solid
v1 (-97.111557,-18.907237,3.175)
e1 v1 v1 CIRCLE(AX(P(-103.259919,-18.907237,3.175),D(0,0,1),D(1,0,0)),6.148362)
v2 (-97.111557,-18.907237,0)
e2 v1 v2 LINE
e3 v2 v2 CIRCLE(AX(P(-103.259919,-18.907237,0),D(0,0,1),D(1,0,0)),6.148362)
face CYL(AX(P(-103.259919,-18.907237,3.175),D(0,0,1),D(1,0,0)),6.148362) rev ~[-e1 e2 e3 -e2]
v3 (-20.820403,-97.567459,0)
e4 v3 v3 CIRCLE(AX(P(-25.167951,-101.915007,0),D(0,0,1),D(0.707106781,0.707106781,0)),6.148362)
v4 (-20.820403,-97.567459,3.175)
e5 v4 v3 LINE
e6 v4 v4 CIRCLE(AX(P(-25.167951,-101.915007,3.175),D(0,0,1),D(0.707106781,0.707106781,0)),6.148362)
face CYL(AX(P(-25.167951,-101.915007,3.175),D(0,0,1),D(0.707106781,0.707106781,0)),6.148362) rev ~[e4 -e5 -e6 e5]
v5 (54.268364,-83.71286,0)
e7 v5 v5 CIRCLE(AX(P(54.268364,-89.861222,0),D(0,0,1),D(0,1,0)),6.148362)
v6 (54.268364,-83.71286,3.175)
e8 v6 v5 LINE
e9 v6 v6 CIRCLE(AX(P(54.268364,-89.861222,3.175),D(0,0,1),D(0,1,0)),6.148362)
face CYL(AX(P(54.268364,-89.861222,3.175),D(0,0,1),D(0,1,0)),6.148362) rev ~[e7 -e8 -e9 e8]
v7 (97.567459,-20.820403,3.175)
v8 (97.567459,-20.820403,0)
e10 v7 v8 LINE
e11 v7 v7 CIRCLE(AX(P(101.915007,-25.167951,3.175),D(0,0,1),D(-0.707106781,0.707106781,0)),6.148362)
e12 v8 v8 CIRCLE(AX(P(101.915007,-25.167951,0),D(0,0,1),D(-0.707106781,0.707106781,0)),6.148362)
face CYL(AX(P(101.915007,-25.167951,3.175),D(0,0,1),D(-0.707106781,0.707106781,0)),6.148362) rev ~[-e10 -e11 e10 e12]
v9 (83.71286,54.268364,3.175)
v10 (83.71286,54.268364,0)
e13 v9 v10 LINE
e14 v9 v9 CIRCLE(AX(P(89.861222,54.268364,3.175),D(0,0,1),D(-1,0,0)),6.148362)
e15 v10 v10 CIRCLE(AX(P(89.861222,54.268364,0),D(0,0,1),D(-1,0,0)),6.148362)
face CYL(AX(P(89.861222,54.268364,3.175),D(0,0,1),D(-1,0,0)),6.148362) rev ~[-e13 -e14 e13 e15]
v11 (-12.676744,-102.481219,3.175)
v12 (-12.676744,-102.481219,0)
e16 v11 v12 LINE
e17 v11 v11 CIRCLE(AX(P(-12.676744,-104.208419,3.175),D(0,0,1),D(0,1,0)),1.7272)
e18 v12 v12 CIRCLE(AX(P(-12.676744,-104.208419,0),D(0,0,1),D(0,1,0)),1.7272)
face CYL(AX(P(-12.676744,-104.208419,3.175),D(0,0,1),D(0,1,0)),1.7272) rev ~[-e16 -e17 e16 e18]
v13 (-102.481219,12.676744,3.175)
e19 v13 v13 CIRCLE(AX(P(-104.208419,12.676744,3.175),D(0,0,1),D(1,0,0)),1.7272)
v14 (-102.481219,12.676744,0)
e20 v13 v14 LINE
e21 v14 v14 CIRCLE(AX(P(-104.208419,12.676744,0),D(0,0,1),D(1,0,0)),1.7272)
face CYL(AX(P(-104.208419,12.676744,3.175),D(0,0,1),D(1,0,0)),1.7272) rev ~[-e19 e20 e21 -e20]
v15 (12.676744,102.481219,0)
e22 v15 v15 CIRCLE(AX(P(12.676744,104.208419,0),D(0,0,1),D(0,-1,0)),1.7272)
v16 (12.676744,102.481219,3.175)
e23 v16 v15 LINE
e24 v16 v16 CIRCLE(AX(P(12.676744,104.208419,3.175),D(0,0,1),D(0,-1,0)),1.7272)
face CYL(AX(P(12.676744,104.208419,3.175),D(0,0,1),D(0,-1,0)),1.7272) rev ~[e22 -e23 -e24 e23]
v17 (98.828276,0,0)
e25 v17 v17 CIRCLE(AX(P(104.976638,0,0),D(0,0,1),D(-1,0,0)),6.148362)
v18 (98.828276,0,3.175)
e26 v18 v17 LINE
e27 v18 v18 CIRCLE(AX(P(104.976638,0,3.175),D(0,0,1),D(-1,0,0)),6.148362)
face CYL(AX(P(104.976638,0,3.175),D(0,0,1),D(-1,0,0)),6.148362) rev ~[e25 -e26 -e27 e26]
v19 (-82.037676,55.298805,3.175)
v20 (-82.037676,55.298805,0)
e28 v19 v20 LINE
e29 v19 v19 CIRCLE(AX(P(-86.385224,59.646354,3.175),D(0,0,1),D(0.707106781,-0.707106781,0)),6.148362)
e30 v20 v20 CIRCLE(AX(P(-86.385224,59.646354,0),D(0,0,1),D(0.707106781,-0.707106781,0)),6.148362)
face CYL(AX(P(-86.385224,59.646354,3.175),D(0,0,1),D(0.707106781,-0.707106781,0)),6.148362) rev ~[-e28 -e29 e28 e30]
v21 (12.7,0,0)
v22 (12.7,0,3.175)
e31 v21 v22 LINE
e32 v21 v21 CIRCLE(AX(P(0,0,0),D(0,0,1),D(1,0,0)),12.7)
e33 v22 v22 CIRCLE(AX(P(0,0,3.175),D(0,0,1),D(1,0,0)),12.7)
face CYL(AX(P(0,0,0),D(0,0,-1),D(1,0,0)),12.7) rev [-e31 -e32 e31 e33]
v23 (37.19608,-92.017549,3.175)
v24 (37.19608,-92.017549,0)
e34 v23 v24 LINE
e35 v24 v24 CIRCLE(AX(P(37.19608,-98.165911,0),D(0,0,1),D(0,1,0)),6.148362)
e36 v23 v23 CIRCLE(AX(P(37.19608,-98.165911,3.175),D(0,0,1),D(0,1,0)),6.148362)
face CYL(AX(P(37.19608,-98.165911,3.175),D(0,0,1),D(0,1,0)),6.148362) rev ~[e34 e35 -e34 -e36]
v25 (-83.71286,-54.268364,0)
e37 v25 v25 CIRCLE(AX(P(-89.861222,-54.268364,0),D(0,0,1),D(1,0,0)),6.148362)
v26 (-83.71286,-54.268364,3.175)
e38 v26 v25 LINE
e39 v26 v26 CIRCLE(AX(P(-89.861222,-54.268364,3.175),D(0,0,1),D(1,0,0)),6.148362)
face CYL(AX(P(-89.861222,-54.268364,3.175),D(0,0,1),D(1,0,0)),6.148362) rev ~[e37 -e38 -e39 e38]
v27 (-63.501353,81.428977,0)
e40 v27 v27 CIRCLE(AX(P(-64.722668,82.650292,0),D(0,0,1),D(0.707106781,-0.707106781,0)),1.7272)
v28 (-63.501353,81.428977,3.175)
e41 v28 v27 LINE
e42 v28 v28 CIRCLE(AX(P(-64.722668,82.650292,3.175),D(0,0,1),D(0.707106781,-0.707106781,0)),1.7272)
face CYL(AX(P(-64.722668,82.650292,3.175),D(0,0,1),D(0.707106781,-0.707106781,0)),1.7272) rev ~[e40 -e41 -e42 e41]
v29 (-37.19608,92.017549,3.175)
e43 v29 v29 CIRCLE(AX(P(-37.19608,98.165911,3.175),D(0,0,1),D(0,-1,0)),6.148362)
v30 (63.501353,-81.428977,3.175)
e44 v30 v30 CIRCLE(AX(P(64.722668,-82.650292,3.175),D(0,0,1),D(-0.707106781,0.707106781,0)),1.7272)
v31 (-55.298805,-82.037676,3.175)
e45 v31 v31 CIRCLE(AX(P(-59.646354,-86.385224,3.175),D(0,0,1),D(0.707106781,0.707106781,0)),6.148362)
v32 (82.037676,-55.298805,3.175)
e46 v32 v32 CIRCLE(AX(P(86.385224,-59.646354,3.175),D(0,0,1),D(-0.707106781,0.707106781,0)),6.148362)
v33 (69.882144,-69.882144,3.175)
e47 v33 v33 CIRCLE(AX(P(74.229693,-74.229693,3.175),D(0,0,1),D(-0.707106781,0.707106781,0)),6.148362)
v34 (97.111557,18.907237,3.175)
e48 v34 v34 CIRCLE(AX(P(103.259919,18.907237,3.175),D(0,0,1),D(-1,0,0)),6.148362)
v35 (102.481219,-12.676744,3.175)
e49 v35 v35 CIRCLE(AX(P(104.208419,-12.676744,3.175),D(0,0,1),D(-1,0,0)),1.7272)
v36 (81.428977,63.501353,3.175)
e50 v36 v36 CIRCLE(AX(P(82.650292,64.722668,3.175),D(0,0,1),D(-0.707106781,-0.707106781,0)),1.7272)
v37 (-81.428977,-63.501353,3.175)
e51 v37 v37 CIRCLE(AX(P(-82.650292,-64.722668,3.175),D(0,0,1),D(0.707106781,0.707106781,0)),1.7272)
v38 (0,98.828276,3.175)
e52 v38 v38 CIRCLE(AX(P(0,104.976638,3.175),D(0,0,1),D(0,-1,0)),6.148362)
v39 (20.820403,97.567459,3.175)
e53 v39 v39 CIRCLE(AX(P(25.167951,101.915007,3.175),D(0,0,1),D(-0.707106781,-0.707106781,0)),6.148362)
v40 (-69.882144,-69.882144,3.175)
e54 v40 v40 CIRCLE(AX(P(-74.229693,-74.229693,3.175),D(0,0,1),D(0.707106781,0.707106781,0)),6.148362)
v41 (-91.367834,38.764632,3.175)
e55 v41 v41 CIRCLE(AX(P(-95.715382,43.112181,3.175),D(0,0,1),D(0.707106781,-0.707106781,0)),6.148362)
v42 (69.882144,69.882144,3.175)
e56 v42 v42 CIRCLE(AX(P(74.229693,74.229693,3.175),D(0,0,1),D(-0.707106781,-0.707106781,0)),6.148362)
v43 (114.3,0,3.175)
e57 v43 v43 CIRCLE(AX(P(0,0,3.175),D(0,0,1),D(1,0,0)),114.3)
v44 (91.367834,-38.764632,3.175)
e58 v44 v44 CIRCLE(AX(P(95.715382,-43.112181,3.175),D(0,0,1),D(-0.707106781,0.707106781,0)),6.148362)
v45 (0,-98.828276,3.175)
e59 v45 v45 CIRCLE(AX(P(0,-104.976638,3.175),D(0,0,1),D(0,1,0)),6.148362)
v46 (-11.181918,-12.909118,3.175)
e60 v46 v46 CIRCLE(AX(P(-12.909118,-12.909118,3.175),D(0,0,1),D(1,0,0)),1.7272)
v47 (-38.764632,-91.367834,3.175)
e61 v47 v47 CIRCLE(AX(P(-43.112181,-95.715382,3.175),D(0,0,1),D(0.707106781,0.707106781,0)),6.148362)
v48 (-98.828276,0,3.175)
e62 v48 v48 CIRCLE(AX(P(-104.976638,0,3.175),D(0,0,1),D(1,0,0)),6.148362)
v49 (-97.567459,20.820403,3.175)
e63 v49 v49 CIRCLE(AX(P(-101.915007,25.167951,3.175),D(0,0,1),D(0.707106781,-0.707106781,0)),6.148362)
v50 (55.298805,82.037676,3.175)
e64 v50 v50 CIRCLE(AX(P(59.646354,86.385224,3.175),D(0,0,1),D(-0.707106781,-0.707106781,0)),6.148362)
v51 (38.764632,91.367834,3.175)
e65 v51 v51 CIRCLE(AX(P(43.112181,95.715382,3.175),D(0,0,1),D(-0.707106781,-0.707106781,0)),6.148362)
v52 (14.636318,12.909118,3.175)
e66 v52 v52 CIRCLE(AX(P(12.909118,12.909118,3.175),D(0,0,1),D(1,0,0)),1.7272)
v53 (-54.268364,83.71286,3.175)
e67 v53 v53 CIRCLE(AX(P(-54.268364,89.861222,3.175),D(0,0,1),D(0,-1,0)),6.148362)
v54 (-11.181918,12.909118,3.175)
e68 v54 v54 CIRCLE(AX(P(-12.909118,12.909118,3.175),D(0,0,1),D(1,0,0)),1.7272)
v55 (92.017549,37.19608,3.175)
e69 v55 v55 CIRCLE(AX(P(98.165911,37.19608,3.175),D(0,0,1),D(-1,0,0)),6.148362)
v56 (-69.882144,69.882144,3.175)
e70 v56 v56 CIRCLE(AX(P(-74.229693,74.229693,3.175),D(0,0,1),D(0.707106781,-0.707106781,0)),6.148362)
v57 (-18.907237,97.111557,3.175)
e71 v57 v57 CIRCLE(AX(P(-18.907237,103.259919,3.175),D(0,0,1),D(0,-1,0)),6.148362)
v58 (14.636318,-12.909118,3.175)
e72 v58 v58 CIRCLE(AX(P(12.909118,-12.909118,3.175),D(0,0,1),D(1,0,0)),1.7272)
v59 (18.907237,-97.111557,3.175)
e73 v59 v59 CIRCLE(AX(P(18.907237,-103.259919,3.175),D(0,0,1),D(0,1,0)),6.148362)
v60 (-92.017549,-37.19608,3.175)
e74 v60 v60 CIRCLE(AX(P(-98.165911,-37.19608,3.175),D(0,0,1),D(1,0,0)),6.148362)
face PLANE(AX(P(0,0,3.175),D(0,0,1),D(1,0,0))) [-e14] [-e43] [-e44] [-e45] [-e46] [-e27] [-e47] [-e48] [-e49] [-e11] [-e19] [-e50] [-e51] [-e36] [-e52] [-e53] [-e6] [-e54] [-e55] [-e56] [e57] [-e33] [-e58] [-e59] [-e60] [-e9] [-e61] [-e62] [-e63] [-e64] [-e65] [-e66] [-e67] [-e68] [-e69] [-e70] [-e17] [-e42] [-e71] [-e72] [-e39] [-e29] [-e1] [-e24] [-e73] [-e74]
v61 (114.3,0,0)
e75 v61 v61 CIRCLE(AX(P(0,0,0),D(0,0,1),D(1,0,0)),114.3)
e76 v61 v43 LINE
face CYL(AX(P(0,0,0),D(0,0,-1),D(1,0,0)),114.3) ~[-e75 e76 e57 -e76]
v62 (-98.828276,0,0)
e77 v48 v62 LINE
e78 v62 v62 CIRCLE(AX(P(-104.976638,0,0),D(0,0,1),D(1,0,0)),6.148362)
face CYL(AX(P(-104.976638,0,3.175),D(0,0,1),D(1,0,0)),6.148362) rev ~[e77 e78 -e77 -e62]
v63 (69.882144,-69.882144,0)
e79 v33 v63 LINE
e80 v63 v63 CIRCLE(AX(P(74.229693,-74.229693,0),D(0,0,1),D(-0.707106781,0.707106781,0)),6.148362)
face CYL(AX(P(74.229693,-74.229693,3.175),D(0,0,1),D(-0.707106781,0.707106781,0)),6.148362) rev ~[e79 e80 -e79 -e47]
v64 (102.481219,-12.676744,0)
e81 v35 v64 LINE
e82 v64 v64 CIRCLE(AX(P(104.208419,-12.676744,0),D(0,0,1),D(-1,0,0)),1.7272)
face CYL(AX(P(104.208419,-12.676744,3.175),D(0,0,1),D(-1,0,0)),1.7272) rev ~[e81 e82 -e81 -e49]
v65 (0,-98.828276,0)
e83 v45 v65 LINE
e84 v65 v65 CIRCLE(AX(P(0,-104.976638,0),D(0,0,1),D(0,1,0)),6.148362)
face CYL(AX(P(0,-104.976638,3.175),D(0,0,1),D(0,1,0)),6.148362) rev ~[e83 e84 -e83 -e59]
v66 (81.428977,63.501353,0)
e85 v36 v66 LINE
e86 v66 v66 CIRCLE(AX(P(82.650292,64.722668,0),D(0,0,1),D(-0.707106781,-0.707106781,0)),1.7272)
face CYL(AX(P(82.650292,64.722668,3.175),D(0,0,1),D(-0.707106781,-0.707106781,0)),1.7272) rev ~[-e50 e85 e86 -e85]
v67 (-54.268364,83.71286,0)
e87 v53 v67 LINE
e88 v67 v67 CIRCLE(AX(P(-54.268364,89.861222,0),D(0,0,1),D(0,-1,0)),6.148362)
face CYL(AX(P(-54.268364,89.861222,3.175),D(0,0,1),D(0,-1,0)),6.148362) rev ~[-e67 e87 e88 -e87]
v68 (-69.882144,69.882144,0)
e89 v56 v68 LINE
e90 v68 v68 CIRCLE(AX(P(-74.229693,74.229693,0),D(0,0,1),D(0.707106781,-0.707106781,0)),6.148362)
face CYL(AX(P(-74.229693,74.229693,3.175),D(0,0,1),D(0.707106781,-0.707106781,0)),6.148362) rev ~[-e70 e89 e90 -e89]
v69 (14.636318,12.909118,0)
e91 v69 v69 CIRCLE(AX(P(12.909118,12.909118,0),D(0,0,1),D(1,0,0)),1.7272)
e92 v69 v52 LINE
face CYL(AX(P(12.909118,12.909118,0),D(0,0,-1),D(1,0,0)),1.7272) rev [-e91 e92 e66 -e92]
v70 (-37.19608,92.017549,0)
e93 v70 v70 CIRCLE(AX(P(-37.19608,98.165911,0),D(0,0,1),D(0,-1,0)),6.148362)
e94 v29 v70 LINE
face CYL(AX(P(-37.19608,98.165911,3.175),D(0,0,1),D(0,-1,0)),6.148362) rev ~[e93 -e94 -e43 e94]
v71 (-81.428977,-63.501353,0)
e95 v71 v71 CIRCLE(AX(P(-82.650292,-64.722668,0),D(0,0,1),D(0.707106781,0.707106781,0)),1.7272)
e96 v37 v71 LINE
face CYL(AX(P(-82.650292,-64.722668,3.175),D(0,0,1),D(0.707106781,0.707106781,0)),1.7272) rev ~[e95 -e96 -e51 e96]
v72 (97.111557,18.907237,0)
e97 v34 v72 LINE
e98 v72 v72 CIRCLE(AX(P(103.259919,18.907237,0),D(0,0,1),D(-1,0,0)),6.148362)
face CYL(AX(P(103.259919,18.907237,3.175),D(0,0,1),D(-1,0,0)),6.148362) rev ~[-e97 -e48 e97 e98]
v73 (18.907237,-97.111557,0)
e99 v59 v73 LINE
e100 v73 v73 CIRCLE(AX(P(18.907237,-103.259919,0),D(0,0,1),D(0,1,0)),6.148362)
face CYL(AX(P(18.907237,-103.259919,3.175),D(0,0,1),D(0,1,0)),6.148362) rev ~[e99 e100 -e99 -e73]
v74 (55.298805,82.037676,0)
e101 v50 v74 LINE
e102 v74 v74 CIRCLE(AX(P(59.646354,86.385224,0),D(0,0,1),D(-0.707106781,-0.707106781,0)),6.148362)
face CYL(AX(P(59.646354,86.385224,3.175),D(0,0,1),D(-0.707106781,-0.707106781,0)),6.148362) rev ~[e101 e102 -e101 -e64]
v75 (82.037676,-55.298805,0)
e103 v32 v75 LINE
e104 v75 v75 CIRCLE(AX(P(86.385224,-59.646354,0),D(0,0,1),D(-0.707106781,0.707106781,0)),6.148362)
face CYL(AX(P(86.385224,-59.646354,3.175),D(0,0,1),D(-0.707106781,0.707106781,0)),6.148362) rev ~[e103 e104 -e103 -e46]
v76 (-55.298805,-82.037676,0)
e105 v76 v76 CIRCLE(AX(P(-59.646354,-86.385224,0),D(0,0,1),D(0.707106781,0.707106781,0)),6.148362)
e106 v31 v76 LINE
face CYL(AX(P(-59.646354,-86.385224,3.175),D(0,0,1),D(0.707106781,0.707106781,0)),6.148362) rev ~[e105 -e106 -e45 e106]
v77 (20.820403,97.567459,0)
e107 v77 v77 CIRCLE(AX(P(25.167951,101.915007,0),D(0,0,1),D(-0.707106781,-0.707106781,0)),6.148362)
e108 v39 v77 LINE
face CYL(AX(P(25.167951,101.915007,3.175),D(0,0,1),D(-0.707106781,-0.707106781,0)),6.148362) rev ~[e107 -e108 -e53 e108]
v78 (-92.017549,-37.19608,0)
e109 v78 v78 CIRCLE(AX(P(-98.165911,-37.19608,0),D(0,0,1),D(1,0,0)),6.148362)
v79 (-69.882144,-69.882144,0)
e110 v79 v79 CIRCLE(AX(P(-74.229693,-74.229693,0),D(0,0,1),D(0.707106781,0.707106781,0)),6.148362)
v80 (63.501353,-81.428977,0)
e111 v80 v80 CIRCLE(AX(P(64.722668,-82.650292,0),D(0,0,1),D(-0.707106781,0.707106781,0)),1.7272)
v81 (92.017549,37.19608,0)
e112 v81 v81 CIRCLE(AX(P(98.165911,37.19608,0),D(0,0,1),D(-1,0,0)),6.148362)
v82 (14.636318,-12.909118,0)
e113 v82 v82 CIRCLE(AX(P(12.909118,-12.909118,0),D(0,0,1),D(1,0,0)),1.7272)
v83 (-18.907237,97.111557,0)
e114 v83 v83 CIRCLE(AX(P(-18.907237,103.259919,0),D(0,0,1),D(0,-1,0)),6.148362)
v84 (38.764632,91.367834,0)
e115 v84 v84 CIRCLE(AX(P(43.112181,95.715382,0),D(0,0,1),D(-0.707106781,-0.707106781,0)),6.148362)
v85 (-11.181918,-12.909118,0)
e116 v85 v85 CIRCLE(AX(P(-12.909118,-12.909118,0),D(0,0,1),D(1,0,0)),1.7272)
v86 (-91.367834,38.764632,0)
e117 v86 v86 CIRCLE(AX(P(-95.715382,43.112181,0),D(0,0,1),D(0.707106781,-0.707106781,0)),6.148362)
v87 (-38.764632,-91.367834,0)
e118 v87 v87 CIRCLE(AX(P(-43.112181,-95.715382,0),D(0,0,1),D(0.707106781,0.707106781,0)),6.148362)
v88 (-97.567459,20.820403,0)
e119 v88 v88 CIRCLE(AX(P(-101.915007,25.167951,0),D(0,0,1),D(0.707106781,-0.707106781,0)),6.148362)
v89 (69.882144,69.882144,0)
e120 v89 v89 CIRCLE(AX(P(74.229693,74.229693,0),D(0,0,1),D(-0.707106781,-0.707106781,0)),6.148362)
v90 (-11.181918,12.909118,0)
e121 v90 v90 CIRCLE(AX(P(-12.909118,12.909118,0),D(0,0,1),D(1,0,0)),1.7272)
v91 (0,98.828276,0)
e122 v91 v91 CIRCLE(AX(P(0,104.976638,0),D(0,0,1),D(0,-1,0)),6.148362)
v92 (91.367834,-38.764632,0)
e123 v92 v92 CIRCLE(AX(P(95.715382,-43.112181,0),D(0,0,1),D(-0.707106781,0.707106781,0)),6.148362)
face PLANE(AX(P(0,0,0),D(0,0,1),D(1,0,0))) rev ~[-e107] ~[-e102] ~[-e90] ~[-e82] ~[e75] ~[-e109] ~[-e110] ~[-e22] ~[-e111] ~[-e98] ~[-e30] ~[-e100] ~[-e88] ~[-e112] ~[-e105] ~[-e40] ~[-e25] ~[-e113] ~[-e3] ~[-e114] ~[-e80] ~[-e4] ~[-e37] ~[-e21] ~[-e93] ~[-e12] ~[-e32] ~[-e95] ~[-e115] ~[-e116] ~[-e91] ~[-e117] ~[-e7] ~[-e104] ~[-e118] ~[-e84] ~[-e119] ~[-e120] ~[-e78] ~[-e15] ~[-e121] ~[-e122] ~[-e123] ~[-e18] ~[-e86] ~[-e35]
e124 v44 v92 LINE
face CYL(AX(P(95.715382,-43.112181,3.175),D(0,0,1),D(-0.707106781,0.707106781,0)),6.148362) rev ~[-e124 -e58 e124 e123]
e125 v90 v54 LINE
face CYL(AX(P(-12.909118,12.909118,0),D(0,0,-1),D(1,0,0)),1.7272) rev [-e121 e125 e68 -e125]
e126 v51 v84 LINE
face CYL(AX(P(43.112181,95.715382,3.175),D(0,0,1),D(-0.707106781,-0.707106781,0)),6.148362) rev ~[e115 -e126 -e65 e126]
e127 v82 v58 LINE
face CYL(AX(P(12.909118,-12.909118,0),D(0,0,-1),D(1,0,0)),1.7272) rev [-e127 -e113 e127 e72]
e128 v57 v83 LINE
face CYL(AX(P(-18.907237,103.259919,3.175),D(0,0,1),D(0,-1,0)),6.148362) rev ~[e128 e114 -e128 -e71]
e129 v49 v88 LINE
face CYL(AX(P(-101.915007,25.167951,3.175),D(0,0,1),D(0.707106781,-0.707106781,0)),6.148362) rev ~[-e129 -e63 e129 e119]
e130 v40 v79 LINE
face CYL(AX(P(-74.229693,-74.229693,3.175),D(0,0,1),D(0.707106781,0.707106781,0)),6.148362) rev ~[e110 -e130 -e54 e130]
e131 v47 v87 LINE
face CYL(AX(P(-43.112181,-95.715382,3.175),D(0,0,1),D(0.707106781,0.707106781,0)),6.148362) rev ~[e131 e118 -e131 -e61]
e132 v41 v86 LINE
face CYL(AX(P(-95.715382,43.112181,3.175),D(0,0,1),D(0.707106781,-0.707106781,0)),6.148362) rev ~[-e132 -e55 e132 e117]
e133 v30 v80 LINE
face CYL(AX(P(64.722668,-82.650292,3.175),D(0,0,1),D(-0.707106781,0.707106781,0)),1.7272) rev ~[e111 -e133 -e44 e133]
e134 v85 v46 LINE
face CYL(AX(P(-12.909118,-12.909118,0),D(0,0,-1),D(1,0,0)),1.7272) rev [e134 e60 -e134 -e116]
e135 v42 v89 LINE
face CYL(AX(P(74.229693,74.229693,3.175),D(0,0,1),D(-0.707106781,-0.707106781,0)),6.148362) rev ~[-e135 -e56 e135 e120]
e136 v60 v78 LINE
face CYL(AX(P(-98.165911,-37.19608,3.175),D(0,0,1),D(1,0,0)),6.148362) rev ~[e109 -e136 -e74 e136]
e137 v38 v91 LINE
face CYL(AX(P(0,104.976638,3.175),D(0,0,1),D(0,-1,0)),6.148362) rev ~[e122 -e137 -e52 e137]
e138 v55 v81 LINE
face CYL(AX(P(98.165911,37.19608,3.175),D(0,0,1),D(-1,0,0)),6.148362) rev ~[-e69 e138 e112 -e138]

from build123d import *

# Parameters (mm, degrees)
F0_R            = 114.3
F0_R_2          = 1.7272
F0_R_3          = 12.7
F1_DEPTH        = 3.175
F2_R            = 6.1483621
F2_R_2          = 1.7272
F3_DEPTH        = 3.175
F3_COPIES_COUNT = 8


# Not quite as in the source:
# - a pattern or mirror of a feature is missing from the dataset's text; its kind, count and spacing are read off the source's solid


with BuildPart() as f1:
    # F0 (on Top) → F1 (new body)
    with BuildSketch(Plane.XY):
        Circle(F0_R)
        with Locations((-12.909118174, -12.909118174)):
            Circle(F0_R_2, mode=Mode.SUBTRACT)
        with Locations((12.909118174, -12.909118174)):
            Circle(F0_R_2, mode=Mode.SUBTRACT)
        with Locations((-12.909118174, 12.909118174)):
            Circle(F0_R_2, mode=Mode.SUBTRACT)
        Circle(F0_R_3, mode=Mode.SUBTRACT)
        with Locations((12.909118174, 12.909118174)):
            Circle(F0_R_2, mode=Mode.SUBTRACT)
    extrude(amount=F1_DEPTH)

    # F2 (on face) → F3 (cut, through all)
    with BuildSketch(Plane.XY.offset(3.175)):
        with Locations((-104.9766379, 0)):
            Circle(F2_R)
        with Locations((-103.2599191691, -18.9072366561)):
            Circle(F2_R)
        with Locations((-98.1659111494, -37.1960803446)):
            Circle(F2_R)
        with Locations((-89.8612219386, -54.2683636799)):
            Circle(F2_R)
        with Locations((-104.2084193553, 12.676744072)):
            Circle(F2_R_2)
    f3 = extrude(amount=-F3_DEPTH, mode=Mode.SUBTRACT)

    # F3_copies: F3 ×8 about axis
    f3_copies_axis = Axis((0, 0, 0), (0, 0, 1))
    for i in range(1, F3_COPIES_COUNT):
        add(f3.rotate(f3_copies_axis, i * 360 / F3_COPIES_COUNT), mode=Mode.SUBTRACT)


solid = f1.part
